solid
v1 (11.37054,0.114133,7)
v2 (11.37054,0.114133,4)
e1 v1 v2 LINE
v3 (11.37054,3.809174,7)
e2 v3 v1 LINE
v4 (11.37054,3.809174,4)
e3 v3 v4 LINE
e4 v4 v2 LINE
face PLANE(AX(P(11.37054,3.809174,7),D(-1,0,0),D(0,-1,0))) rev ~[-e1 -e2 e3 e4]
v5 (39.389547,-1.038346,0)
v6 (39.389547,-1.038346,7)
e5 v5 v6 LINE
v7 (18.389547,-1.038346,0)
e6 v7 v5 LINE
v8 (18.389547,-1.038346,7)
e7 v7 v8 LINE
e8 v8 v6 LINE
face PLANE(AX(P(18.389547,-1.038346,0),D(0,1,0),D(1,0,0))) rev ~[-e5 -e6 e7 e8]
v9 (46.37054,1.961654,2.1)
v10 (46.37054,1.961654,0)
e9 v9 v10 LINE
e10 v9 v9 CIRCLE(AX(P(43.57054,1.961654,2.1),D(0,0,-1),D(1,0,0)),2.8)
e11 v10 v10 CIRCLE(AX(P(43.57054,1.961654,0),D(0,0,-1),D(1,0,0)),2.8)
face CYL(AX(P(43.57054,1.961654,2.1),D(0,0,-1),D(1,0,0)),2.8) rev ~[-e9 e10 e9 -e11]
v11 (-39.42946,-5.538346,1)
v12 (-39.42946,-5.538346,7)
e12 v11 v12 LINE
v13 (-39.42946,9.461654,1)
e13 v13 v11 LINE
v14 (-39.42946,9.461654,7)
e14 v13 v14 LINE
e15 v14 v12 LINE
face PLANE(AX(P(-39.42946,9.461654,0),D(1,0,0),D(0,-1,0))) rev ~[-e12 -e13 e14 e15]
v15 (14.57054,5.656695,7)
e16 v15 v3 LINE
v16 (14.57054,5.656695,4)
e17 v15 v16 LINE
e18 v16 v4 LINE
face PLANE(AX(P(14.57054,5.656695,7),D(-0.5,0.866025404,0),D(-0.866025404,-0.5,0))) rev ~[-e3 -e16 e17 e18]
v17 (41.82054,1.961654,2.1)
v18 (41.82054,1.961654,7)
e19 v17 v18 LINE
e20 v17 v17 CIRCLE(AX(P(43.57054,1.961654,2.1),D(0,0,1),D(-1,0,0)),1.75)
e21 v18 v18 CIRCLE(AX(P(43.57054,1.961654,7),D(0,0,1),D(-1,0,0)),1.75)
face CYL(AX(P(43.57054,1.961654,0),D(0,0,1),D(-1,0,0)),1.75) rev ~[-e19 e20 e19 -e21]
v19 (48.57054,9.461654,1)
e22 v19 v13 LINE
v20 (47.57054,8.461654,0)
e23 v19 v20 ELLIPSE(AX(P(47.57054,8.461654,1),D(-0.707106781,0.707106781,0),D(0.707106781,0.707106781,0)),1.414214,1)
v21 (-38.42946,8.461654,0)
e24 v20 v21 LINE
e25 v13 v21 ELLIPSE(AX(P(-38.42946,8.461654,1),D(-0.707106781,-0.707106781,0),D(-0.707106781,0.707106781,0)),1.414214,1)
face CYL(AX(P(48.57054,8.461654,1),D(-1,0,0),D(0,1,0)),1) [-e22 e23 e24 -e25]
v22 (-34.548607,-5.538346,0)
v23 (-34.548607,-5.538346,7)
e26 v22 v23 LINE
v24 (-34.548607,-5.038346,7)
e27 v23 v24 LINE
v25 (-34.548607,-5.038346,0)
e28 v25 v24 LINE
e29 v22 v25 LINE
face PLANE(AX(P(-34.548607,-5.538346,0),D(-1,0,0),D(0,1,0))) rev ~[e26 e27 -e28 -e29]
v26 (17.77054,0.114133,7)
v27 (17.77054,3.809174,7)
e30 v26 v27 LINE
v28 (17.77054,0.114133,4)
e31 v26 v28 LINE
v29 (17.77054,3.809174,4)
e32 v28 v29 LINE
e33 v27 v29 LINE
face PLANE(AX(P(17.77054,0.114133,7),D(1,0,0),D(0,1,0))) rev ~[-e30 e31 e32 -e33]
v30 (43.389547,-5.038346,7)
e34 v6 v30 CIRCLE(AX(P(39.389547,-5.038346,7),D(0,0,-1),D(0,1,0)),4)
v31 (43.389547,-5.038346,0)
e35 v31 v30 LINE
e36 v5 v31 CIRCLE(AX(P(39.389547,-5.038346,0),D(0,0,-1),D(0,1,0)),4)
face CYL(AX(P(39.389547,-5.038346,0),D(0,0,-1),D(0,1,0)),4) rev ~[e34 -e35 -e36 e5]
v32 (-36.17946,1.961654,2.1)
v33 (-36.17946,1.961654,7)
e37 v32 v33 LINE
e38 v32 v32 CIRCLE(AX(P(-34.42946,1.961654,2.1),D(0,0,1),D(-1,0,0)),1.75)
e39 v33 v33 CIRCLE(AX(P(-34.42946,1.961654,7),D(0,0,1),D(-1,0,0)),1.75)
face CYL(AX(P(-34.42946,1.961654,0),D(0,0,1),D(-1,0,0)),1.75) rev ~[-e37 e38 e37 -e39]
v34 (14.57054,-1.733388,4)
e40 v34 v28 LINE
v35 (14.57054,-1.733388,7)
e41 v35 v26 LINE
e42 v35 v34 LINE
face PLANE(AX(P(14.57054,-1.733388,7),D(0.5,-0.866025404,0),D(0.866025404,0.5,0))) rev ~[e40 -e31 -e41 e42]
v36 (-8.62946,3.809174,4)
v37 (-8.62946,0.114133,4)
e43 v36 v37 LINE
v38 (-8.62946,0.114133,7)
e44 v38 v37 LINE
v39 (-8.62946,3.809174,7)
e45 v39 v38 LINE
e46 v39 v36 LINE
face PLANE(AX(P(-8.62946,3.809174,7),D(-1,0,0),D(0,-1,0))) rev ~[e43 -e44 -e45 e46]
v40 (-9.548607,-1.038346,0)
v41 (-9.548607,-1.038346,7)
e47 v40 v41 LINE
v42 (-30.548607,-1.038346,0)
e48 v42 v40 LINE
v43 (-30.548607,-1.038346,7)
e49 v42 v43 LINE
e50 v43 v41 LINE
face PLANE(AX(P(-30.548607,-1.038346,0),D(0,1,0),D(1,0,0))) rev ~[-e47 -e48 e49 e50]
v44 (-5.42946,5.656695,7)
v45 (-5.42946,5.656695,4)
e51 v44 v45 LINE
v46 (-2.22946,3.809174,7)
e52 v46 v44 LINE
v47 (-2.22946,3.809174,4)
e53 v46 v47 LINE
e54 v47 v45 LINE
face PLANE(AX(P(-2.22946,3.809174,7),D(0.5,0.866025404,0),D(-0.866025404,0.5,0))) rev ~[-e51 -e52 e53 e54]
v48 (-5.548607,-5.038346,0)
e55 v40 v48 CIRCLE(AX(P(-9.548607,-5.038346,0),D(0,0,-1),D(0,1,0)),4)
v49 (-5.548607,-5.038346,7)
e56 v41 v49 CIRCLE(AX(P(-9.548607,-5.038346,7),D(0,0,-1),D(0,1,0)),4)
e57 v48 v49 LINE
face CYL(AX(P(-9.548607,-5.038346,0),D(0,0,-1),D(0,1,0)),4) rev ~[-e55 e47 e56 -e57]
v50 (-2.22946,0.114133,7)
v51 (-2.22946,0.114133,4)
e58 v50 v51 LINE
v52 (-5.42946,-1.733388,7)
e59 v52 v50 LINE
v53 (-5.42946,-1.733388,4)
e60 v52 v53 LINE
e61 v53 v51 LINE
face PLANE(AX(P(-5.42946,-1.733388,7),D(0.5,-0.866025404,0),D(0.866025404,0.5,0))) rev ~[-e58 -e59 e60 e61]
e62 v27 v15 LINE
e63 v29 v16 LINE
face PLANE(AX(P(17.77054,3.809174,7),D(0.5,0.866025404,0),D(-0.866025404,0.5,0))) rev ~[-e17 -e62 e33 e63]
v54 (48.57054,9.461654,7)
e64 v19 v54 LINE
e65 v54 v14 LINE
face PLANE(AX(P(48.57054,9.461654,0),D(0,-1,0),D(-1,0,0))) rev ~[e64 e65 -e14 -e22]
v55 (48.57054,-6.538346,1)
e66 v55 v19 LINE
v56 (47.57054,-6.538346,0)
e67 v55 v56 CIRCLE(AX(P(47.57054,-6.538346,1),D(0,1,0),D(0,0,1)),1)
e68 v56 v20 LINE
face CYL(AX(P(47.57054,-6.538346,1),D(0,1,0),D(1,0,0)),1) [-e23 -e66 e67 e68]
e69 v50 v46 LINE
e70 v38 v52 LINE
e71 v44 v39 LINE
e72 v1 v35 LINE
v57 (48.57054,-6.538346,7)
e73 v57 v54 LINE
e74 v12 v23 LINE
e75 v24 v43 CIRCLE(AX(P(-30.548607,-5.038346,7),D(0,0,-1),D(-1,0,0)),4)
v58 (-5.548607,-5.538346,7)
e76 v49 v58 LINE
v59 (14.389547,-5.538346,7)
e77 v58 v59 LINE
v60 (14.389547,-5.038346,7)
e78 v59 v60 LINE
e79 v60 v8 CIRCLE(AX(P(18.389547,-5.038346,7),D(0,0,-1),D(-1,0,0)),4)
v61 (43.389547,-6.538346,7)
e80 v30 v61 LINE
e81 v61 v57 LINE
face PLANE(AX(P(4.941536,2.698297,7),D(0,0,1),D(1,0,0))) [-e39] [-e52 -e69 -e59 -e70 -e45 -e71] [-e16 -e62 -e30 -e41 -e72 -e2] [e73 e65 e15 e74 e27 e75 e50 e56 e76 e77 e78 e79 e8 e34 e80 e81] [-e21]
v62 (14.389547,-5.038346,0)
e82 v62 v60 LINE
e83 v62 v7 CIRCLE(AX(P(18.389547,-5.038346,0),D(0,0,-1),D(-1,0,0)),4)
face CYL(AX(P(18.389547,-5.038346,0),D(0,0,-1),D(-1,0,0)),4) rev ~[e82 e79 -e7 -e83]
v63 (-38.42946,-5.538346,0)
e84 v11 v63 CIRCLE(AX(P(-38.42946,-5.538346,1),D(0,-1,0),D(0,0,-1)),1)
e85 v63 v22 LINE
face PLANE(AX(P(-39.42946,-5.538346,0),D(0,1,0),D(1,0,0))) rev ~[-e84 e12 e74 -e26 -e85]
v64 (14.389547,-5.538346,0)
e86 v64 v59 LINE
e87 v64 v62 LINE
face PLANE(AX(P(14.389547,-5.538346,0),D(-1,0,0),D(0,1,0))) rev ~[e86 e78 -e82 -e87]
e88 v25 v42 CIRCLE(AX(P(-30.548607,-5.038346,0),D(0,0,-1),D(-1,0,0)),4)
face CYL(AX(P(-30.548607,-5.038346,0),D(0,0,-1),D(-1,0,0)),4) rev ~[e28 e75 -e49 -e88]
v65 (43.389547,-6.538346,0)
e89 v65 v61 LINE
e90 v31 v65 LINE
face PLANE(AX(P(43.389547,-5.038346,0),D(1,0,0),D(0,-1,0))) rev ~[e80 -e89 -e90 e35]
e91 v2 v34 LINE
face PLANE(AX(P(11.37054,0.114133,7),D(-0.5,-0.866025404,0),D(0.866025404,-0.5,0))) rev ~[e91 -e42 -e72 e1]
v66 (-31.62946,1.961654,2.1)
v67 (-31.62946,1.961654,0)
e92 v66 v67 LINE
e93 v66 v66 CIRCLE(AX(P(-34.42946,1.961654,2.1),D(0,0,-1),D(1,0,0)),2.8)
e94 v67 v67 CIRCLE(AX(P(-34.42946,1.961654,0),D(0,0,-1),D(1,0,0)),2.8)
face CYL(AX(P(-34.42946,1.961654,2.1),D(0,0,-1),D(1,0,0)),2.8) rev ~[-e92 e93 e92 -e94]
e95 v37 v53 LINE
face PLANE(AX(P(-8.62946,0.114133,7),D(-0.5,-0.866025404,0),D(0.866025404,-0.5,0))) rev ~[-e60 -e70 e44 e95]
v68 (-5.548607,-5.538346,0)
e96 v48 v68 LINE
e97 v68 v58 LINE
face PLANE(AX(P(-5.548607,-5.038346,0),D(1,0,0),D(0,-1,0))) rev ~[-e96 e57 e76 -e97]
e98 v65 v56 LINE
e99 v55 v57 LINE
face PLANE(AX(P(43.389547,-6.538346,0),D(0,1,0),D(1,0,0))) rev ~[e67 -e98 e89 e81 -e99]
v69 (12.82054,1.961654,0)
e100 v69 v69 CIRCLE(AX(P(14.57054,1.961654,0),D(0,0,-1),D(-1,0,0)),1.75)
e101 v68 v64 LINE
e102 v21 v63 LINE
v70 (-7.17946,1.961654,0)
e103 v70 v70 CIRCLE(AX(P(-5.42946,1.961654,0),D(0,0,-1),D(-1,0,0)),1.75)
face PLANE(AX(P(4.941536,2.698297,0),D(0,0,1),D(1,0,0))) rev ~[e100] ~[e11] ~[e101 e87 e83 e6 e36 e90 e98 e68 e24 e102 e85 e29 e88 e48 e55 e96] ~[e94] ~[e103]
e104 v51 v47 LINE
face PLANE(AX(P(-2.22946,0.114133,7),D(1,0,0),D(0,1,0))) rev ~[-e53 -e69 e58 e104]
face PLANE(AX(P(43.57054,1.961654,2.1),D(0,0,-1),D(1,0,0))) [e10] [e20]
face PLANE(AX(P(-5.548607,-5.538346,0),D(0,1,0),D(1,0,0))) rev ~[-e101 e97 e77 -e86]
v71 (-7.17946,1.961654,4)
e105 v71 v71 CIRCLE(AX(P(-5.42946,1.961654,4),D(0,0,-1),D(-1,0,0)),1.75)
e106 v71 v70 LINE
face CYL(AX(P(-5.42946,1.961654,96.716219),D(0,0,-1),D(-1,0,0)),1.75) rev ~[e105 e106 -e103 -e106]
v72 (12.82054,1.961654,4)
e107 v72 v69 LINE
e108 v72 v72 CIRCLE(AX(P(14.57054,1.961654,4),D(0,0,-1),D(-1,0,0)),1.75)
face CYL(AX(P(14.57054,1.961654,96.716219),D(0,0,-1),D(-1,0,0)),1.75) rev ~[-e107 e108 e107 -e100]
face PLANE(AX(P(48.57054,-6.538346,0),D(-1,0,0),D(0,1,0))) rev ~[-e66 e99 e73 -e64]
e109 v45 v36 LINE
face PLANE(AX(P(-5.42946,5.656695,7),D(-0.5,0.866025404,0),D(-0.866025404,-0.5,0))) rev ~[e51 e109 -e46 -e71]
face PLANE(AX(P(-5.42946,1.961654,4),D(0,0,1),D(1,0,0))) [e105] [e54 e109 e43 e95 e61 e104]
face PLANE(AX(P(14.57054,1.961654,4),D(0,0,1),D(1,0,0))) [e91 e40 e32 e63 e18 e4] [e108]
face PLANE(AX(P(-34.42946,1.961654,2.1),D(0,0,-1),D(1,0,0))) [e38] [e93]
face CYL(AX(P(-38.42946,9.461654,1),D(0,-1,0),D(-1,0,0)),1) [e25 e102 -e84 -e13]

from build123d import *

# Parameters (mm, degrees)
F1_DEPTH       = 7
F3_DEPTH       = 3
F4_D           = 3.5
F5_R           = 1
F7_D           = 3.5
F7_CBORE_D     = 5.6
F7_CBORE_DEPTH = 2.1


# Not quite as in the source:
# - a feature names something its author has since deleted; it is built from what else it names


with BuildPart() as f1:
    # F0 (on Top) → F1 (new body)
    with BuildSketch(Plane.XY):
        with BuildLine():
            Line((48.5705398023, 9.4616535902), (-39.4294601977, 9.4616535902))
            Line((-39.4294601977, 9.4616535902), (-39.4294601977, -5.5383464098))
            Line((-39.4294601977, -5.5383464098), (-34.5486067235, -5.5383464098))
            Line((-34.5486067235, -5.5383464098), (-34.5486067235, -5.0383464098))
            ThreePointArc((-34.5486067235, -5.0383464098), (-33.3770338483, -2.2099192851), (-30.5486067235, -1.0383464098))
            Line((-30.5486067235, -1.0383464098), (-9.5486067235, -1.0383464098))
            ThreePointArc((-9.5486067235, -1.0383464098), (-6.7201795988, -2.2099192851), (-5.5486067235, -5.0383464098))
            Line((-5.5486067235, -5.0383464098), (-5.5486067235, -5.5383464098))
            Line((-5.5486067235, -5.5383464098), (14.3895465881, -5.5383464098))
            Line((14.3895465881, -5.5383464098), (14.3895465881, -5.0383464098))
            ThreePointArc((14.3895465881, -5.0383464098), (15.5611194633, -2.2099192851), (18.3895465881, -1.0383464098))
            Line((18.3895465881, -1.0383464098), (39.3895465881, -1.0383464098))
            ThreePointArc((39.3895465881, -1.0383464098), (42.2179737128, -2.2099192851), (43.3895465881, -5.0383464098))
            Line((43.3895465881, -5.0383464098), (43.3895465881, -6.5383464098))
            Line((43.3895465881, -6.5383464098), (48.5705398023, -6.5383464098))
            Line((48.5705398023, -6.5383464098), (48.5705398023, 9.4616535902))
        make_face()
    extrude(amount=F1_DEPTH)

    # F2 (on face) → F3 (cut)
    with BuildSketch(Plane.XY.offset(7)):
        Polygon((17.7705398023, 0.1141327288), (17.7705398023, 3.8091744516), (14.5705398023, 5.656695313), (11.3705398023, 3.8091744516), (11.3705398023, 0.1141327288), (14.5705398023, -1.7333881326), align=None)
        Polygon((-8.6294601977, 3.8091744516), (-8.6294601977, 0.1141327288), (-5.4294601977, -1.7333881326), (-2.2294601977, 0.1141327288), (-2.2294601977, 3.8091744516), (-5.4294601977, 5.656695313), align=None)
    extrude(amount=-F3_DEPTH, mode=Mode.SUBTRACT)

    # F4 (through all)
    with Locations(Plane.XY.offset(7)):
        with Locations((-5.4294601977, 1.9616535902), (14.5705398023, 1.9616535902)):
            Hole(F4_D / 2)

    # F5
    f5_edges = [f1.edges().sort_by_distance(p)[0] for p in [
        (48.57054, 1.461654, 0),
        (4.57054, 9.461654, 0),
        (-39.42946, 1.961654, 0),
    ]]
    fillet(f5_edges, radius=F5_R)

    # F7 (through all)
    with Locations(Plane(origin=(0, 0, 0), x_dir=(1, 0, 0), z_dir=(0, 0, -1))):
        with Locations((-34.4294601977, -1.9616535902), (43.5705398023, -1.9616535902)):
            CounterBoreHole(F7_D / 2, F7_CBORE_D / 2, F7_CBORE_DEPTH)


solid = f1.part
